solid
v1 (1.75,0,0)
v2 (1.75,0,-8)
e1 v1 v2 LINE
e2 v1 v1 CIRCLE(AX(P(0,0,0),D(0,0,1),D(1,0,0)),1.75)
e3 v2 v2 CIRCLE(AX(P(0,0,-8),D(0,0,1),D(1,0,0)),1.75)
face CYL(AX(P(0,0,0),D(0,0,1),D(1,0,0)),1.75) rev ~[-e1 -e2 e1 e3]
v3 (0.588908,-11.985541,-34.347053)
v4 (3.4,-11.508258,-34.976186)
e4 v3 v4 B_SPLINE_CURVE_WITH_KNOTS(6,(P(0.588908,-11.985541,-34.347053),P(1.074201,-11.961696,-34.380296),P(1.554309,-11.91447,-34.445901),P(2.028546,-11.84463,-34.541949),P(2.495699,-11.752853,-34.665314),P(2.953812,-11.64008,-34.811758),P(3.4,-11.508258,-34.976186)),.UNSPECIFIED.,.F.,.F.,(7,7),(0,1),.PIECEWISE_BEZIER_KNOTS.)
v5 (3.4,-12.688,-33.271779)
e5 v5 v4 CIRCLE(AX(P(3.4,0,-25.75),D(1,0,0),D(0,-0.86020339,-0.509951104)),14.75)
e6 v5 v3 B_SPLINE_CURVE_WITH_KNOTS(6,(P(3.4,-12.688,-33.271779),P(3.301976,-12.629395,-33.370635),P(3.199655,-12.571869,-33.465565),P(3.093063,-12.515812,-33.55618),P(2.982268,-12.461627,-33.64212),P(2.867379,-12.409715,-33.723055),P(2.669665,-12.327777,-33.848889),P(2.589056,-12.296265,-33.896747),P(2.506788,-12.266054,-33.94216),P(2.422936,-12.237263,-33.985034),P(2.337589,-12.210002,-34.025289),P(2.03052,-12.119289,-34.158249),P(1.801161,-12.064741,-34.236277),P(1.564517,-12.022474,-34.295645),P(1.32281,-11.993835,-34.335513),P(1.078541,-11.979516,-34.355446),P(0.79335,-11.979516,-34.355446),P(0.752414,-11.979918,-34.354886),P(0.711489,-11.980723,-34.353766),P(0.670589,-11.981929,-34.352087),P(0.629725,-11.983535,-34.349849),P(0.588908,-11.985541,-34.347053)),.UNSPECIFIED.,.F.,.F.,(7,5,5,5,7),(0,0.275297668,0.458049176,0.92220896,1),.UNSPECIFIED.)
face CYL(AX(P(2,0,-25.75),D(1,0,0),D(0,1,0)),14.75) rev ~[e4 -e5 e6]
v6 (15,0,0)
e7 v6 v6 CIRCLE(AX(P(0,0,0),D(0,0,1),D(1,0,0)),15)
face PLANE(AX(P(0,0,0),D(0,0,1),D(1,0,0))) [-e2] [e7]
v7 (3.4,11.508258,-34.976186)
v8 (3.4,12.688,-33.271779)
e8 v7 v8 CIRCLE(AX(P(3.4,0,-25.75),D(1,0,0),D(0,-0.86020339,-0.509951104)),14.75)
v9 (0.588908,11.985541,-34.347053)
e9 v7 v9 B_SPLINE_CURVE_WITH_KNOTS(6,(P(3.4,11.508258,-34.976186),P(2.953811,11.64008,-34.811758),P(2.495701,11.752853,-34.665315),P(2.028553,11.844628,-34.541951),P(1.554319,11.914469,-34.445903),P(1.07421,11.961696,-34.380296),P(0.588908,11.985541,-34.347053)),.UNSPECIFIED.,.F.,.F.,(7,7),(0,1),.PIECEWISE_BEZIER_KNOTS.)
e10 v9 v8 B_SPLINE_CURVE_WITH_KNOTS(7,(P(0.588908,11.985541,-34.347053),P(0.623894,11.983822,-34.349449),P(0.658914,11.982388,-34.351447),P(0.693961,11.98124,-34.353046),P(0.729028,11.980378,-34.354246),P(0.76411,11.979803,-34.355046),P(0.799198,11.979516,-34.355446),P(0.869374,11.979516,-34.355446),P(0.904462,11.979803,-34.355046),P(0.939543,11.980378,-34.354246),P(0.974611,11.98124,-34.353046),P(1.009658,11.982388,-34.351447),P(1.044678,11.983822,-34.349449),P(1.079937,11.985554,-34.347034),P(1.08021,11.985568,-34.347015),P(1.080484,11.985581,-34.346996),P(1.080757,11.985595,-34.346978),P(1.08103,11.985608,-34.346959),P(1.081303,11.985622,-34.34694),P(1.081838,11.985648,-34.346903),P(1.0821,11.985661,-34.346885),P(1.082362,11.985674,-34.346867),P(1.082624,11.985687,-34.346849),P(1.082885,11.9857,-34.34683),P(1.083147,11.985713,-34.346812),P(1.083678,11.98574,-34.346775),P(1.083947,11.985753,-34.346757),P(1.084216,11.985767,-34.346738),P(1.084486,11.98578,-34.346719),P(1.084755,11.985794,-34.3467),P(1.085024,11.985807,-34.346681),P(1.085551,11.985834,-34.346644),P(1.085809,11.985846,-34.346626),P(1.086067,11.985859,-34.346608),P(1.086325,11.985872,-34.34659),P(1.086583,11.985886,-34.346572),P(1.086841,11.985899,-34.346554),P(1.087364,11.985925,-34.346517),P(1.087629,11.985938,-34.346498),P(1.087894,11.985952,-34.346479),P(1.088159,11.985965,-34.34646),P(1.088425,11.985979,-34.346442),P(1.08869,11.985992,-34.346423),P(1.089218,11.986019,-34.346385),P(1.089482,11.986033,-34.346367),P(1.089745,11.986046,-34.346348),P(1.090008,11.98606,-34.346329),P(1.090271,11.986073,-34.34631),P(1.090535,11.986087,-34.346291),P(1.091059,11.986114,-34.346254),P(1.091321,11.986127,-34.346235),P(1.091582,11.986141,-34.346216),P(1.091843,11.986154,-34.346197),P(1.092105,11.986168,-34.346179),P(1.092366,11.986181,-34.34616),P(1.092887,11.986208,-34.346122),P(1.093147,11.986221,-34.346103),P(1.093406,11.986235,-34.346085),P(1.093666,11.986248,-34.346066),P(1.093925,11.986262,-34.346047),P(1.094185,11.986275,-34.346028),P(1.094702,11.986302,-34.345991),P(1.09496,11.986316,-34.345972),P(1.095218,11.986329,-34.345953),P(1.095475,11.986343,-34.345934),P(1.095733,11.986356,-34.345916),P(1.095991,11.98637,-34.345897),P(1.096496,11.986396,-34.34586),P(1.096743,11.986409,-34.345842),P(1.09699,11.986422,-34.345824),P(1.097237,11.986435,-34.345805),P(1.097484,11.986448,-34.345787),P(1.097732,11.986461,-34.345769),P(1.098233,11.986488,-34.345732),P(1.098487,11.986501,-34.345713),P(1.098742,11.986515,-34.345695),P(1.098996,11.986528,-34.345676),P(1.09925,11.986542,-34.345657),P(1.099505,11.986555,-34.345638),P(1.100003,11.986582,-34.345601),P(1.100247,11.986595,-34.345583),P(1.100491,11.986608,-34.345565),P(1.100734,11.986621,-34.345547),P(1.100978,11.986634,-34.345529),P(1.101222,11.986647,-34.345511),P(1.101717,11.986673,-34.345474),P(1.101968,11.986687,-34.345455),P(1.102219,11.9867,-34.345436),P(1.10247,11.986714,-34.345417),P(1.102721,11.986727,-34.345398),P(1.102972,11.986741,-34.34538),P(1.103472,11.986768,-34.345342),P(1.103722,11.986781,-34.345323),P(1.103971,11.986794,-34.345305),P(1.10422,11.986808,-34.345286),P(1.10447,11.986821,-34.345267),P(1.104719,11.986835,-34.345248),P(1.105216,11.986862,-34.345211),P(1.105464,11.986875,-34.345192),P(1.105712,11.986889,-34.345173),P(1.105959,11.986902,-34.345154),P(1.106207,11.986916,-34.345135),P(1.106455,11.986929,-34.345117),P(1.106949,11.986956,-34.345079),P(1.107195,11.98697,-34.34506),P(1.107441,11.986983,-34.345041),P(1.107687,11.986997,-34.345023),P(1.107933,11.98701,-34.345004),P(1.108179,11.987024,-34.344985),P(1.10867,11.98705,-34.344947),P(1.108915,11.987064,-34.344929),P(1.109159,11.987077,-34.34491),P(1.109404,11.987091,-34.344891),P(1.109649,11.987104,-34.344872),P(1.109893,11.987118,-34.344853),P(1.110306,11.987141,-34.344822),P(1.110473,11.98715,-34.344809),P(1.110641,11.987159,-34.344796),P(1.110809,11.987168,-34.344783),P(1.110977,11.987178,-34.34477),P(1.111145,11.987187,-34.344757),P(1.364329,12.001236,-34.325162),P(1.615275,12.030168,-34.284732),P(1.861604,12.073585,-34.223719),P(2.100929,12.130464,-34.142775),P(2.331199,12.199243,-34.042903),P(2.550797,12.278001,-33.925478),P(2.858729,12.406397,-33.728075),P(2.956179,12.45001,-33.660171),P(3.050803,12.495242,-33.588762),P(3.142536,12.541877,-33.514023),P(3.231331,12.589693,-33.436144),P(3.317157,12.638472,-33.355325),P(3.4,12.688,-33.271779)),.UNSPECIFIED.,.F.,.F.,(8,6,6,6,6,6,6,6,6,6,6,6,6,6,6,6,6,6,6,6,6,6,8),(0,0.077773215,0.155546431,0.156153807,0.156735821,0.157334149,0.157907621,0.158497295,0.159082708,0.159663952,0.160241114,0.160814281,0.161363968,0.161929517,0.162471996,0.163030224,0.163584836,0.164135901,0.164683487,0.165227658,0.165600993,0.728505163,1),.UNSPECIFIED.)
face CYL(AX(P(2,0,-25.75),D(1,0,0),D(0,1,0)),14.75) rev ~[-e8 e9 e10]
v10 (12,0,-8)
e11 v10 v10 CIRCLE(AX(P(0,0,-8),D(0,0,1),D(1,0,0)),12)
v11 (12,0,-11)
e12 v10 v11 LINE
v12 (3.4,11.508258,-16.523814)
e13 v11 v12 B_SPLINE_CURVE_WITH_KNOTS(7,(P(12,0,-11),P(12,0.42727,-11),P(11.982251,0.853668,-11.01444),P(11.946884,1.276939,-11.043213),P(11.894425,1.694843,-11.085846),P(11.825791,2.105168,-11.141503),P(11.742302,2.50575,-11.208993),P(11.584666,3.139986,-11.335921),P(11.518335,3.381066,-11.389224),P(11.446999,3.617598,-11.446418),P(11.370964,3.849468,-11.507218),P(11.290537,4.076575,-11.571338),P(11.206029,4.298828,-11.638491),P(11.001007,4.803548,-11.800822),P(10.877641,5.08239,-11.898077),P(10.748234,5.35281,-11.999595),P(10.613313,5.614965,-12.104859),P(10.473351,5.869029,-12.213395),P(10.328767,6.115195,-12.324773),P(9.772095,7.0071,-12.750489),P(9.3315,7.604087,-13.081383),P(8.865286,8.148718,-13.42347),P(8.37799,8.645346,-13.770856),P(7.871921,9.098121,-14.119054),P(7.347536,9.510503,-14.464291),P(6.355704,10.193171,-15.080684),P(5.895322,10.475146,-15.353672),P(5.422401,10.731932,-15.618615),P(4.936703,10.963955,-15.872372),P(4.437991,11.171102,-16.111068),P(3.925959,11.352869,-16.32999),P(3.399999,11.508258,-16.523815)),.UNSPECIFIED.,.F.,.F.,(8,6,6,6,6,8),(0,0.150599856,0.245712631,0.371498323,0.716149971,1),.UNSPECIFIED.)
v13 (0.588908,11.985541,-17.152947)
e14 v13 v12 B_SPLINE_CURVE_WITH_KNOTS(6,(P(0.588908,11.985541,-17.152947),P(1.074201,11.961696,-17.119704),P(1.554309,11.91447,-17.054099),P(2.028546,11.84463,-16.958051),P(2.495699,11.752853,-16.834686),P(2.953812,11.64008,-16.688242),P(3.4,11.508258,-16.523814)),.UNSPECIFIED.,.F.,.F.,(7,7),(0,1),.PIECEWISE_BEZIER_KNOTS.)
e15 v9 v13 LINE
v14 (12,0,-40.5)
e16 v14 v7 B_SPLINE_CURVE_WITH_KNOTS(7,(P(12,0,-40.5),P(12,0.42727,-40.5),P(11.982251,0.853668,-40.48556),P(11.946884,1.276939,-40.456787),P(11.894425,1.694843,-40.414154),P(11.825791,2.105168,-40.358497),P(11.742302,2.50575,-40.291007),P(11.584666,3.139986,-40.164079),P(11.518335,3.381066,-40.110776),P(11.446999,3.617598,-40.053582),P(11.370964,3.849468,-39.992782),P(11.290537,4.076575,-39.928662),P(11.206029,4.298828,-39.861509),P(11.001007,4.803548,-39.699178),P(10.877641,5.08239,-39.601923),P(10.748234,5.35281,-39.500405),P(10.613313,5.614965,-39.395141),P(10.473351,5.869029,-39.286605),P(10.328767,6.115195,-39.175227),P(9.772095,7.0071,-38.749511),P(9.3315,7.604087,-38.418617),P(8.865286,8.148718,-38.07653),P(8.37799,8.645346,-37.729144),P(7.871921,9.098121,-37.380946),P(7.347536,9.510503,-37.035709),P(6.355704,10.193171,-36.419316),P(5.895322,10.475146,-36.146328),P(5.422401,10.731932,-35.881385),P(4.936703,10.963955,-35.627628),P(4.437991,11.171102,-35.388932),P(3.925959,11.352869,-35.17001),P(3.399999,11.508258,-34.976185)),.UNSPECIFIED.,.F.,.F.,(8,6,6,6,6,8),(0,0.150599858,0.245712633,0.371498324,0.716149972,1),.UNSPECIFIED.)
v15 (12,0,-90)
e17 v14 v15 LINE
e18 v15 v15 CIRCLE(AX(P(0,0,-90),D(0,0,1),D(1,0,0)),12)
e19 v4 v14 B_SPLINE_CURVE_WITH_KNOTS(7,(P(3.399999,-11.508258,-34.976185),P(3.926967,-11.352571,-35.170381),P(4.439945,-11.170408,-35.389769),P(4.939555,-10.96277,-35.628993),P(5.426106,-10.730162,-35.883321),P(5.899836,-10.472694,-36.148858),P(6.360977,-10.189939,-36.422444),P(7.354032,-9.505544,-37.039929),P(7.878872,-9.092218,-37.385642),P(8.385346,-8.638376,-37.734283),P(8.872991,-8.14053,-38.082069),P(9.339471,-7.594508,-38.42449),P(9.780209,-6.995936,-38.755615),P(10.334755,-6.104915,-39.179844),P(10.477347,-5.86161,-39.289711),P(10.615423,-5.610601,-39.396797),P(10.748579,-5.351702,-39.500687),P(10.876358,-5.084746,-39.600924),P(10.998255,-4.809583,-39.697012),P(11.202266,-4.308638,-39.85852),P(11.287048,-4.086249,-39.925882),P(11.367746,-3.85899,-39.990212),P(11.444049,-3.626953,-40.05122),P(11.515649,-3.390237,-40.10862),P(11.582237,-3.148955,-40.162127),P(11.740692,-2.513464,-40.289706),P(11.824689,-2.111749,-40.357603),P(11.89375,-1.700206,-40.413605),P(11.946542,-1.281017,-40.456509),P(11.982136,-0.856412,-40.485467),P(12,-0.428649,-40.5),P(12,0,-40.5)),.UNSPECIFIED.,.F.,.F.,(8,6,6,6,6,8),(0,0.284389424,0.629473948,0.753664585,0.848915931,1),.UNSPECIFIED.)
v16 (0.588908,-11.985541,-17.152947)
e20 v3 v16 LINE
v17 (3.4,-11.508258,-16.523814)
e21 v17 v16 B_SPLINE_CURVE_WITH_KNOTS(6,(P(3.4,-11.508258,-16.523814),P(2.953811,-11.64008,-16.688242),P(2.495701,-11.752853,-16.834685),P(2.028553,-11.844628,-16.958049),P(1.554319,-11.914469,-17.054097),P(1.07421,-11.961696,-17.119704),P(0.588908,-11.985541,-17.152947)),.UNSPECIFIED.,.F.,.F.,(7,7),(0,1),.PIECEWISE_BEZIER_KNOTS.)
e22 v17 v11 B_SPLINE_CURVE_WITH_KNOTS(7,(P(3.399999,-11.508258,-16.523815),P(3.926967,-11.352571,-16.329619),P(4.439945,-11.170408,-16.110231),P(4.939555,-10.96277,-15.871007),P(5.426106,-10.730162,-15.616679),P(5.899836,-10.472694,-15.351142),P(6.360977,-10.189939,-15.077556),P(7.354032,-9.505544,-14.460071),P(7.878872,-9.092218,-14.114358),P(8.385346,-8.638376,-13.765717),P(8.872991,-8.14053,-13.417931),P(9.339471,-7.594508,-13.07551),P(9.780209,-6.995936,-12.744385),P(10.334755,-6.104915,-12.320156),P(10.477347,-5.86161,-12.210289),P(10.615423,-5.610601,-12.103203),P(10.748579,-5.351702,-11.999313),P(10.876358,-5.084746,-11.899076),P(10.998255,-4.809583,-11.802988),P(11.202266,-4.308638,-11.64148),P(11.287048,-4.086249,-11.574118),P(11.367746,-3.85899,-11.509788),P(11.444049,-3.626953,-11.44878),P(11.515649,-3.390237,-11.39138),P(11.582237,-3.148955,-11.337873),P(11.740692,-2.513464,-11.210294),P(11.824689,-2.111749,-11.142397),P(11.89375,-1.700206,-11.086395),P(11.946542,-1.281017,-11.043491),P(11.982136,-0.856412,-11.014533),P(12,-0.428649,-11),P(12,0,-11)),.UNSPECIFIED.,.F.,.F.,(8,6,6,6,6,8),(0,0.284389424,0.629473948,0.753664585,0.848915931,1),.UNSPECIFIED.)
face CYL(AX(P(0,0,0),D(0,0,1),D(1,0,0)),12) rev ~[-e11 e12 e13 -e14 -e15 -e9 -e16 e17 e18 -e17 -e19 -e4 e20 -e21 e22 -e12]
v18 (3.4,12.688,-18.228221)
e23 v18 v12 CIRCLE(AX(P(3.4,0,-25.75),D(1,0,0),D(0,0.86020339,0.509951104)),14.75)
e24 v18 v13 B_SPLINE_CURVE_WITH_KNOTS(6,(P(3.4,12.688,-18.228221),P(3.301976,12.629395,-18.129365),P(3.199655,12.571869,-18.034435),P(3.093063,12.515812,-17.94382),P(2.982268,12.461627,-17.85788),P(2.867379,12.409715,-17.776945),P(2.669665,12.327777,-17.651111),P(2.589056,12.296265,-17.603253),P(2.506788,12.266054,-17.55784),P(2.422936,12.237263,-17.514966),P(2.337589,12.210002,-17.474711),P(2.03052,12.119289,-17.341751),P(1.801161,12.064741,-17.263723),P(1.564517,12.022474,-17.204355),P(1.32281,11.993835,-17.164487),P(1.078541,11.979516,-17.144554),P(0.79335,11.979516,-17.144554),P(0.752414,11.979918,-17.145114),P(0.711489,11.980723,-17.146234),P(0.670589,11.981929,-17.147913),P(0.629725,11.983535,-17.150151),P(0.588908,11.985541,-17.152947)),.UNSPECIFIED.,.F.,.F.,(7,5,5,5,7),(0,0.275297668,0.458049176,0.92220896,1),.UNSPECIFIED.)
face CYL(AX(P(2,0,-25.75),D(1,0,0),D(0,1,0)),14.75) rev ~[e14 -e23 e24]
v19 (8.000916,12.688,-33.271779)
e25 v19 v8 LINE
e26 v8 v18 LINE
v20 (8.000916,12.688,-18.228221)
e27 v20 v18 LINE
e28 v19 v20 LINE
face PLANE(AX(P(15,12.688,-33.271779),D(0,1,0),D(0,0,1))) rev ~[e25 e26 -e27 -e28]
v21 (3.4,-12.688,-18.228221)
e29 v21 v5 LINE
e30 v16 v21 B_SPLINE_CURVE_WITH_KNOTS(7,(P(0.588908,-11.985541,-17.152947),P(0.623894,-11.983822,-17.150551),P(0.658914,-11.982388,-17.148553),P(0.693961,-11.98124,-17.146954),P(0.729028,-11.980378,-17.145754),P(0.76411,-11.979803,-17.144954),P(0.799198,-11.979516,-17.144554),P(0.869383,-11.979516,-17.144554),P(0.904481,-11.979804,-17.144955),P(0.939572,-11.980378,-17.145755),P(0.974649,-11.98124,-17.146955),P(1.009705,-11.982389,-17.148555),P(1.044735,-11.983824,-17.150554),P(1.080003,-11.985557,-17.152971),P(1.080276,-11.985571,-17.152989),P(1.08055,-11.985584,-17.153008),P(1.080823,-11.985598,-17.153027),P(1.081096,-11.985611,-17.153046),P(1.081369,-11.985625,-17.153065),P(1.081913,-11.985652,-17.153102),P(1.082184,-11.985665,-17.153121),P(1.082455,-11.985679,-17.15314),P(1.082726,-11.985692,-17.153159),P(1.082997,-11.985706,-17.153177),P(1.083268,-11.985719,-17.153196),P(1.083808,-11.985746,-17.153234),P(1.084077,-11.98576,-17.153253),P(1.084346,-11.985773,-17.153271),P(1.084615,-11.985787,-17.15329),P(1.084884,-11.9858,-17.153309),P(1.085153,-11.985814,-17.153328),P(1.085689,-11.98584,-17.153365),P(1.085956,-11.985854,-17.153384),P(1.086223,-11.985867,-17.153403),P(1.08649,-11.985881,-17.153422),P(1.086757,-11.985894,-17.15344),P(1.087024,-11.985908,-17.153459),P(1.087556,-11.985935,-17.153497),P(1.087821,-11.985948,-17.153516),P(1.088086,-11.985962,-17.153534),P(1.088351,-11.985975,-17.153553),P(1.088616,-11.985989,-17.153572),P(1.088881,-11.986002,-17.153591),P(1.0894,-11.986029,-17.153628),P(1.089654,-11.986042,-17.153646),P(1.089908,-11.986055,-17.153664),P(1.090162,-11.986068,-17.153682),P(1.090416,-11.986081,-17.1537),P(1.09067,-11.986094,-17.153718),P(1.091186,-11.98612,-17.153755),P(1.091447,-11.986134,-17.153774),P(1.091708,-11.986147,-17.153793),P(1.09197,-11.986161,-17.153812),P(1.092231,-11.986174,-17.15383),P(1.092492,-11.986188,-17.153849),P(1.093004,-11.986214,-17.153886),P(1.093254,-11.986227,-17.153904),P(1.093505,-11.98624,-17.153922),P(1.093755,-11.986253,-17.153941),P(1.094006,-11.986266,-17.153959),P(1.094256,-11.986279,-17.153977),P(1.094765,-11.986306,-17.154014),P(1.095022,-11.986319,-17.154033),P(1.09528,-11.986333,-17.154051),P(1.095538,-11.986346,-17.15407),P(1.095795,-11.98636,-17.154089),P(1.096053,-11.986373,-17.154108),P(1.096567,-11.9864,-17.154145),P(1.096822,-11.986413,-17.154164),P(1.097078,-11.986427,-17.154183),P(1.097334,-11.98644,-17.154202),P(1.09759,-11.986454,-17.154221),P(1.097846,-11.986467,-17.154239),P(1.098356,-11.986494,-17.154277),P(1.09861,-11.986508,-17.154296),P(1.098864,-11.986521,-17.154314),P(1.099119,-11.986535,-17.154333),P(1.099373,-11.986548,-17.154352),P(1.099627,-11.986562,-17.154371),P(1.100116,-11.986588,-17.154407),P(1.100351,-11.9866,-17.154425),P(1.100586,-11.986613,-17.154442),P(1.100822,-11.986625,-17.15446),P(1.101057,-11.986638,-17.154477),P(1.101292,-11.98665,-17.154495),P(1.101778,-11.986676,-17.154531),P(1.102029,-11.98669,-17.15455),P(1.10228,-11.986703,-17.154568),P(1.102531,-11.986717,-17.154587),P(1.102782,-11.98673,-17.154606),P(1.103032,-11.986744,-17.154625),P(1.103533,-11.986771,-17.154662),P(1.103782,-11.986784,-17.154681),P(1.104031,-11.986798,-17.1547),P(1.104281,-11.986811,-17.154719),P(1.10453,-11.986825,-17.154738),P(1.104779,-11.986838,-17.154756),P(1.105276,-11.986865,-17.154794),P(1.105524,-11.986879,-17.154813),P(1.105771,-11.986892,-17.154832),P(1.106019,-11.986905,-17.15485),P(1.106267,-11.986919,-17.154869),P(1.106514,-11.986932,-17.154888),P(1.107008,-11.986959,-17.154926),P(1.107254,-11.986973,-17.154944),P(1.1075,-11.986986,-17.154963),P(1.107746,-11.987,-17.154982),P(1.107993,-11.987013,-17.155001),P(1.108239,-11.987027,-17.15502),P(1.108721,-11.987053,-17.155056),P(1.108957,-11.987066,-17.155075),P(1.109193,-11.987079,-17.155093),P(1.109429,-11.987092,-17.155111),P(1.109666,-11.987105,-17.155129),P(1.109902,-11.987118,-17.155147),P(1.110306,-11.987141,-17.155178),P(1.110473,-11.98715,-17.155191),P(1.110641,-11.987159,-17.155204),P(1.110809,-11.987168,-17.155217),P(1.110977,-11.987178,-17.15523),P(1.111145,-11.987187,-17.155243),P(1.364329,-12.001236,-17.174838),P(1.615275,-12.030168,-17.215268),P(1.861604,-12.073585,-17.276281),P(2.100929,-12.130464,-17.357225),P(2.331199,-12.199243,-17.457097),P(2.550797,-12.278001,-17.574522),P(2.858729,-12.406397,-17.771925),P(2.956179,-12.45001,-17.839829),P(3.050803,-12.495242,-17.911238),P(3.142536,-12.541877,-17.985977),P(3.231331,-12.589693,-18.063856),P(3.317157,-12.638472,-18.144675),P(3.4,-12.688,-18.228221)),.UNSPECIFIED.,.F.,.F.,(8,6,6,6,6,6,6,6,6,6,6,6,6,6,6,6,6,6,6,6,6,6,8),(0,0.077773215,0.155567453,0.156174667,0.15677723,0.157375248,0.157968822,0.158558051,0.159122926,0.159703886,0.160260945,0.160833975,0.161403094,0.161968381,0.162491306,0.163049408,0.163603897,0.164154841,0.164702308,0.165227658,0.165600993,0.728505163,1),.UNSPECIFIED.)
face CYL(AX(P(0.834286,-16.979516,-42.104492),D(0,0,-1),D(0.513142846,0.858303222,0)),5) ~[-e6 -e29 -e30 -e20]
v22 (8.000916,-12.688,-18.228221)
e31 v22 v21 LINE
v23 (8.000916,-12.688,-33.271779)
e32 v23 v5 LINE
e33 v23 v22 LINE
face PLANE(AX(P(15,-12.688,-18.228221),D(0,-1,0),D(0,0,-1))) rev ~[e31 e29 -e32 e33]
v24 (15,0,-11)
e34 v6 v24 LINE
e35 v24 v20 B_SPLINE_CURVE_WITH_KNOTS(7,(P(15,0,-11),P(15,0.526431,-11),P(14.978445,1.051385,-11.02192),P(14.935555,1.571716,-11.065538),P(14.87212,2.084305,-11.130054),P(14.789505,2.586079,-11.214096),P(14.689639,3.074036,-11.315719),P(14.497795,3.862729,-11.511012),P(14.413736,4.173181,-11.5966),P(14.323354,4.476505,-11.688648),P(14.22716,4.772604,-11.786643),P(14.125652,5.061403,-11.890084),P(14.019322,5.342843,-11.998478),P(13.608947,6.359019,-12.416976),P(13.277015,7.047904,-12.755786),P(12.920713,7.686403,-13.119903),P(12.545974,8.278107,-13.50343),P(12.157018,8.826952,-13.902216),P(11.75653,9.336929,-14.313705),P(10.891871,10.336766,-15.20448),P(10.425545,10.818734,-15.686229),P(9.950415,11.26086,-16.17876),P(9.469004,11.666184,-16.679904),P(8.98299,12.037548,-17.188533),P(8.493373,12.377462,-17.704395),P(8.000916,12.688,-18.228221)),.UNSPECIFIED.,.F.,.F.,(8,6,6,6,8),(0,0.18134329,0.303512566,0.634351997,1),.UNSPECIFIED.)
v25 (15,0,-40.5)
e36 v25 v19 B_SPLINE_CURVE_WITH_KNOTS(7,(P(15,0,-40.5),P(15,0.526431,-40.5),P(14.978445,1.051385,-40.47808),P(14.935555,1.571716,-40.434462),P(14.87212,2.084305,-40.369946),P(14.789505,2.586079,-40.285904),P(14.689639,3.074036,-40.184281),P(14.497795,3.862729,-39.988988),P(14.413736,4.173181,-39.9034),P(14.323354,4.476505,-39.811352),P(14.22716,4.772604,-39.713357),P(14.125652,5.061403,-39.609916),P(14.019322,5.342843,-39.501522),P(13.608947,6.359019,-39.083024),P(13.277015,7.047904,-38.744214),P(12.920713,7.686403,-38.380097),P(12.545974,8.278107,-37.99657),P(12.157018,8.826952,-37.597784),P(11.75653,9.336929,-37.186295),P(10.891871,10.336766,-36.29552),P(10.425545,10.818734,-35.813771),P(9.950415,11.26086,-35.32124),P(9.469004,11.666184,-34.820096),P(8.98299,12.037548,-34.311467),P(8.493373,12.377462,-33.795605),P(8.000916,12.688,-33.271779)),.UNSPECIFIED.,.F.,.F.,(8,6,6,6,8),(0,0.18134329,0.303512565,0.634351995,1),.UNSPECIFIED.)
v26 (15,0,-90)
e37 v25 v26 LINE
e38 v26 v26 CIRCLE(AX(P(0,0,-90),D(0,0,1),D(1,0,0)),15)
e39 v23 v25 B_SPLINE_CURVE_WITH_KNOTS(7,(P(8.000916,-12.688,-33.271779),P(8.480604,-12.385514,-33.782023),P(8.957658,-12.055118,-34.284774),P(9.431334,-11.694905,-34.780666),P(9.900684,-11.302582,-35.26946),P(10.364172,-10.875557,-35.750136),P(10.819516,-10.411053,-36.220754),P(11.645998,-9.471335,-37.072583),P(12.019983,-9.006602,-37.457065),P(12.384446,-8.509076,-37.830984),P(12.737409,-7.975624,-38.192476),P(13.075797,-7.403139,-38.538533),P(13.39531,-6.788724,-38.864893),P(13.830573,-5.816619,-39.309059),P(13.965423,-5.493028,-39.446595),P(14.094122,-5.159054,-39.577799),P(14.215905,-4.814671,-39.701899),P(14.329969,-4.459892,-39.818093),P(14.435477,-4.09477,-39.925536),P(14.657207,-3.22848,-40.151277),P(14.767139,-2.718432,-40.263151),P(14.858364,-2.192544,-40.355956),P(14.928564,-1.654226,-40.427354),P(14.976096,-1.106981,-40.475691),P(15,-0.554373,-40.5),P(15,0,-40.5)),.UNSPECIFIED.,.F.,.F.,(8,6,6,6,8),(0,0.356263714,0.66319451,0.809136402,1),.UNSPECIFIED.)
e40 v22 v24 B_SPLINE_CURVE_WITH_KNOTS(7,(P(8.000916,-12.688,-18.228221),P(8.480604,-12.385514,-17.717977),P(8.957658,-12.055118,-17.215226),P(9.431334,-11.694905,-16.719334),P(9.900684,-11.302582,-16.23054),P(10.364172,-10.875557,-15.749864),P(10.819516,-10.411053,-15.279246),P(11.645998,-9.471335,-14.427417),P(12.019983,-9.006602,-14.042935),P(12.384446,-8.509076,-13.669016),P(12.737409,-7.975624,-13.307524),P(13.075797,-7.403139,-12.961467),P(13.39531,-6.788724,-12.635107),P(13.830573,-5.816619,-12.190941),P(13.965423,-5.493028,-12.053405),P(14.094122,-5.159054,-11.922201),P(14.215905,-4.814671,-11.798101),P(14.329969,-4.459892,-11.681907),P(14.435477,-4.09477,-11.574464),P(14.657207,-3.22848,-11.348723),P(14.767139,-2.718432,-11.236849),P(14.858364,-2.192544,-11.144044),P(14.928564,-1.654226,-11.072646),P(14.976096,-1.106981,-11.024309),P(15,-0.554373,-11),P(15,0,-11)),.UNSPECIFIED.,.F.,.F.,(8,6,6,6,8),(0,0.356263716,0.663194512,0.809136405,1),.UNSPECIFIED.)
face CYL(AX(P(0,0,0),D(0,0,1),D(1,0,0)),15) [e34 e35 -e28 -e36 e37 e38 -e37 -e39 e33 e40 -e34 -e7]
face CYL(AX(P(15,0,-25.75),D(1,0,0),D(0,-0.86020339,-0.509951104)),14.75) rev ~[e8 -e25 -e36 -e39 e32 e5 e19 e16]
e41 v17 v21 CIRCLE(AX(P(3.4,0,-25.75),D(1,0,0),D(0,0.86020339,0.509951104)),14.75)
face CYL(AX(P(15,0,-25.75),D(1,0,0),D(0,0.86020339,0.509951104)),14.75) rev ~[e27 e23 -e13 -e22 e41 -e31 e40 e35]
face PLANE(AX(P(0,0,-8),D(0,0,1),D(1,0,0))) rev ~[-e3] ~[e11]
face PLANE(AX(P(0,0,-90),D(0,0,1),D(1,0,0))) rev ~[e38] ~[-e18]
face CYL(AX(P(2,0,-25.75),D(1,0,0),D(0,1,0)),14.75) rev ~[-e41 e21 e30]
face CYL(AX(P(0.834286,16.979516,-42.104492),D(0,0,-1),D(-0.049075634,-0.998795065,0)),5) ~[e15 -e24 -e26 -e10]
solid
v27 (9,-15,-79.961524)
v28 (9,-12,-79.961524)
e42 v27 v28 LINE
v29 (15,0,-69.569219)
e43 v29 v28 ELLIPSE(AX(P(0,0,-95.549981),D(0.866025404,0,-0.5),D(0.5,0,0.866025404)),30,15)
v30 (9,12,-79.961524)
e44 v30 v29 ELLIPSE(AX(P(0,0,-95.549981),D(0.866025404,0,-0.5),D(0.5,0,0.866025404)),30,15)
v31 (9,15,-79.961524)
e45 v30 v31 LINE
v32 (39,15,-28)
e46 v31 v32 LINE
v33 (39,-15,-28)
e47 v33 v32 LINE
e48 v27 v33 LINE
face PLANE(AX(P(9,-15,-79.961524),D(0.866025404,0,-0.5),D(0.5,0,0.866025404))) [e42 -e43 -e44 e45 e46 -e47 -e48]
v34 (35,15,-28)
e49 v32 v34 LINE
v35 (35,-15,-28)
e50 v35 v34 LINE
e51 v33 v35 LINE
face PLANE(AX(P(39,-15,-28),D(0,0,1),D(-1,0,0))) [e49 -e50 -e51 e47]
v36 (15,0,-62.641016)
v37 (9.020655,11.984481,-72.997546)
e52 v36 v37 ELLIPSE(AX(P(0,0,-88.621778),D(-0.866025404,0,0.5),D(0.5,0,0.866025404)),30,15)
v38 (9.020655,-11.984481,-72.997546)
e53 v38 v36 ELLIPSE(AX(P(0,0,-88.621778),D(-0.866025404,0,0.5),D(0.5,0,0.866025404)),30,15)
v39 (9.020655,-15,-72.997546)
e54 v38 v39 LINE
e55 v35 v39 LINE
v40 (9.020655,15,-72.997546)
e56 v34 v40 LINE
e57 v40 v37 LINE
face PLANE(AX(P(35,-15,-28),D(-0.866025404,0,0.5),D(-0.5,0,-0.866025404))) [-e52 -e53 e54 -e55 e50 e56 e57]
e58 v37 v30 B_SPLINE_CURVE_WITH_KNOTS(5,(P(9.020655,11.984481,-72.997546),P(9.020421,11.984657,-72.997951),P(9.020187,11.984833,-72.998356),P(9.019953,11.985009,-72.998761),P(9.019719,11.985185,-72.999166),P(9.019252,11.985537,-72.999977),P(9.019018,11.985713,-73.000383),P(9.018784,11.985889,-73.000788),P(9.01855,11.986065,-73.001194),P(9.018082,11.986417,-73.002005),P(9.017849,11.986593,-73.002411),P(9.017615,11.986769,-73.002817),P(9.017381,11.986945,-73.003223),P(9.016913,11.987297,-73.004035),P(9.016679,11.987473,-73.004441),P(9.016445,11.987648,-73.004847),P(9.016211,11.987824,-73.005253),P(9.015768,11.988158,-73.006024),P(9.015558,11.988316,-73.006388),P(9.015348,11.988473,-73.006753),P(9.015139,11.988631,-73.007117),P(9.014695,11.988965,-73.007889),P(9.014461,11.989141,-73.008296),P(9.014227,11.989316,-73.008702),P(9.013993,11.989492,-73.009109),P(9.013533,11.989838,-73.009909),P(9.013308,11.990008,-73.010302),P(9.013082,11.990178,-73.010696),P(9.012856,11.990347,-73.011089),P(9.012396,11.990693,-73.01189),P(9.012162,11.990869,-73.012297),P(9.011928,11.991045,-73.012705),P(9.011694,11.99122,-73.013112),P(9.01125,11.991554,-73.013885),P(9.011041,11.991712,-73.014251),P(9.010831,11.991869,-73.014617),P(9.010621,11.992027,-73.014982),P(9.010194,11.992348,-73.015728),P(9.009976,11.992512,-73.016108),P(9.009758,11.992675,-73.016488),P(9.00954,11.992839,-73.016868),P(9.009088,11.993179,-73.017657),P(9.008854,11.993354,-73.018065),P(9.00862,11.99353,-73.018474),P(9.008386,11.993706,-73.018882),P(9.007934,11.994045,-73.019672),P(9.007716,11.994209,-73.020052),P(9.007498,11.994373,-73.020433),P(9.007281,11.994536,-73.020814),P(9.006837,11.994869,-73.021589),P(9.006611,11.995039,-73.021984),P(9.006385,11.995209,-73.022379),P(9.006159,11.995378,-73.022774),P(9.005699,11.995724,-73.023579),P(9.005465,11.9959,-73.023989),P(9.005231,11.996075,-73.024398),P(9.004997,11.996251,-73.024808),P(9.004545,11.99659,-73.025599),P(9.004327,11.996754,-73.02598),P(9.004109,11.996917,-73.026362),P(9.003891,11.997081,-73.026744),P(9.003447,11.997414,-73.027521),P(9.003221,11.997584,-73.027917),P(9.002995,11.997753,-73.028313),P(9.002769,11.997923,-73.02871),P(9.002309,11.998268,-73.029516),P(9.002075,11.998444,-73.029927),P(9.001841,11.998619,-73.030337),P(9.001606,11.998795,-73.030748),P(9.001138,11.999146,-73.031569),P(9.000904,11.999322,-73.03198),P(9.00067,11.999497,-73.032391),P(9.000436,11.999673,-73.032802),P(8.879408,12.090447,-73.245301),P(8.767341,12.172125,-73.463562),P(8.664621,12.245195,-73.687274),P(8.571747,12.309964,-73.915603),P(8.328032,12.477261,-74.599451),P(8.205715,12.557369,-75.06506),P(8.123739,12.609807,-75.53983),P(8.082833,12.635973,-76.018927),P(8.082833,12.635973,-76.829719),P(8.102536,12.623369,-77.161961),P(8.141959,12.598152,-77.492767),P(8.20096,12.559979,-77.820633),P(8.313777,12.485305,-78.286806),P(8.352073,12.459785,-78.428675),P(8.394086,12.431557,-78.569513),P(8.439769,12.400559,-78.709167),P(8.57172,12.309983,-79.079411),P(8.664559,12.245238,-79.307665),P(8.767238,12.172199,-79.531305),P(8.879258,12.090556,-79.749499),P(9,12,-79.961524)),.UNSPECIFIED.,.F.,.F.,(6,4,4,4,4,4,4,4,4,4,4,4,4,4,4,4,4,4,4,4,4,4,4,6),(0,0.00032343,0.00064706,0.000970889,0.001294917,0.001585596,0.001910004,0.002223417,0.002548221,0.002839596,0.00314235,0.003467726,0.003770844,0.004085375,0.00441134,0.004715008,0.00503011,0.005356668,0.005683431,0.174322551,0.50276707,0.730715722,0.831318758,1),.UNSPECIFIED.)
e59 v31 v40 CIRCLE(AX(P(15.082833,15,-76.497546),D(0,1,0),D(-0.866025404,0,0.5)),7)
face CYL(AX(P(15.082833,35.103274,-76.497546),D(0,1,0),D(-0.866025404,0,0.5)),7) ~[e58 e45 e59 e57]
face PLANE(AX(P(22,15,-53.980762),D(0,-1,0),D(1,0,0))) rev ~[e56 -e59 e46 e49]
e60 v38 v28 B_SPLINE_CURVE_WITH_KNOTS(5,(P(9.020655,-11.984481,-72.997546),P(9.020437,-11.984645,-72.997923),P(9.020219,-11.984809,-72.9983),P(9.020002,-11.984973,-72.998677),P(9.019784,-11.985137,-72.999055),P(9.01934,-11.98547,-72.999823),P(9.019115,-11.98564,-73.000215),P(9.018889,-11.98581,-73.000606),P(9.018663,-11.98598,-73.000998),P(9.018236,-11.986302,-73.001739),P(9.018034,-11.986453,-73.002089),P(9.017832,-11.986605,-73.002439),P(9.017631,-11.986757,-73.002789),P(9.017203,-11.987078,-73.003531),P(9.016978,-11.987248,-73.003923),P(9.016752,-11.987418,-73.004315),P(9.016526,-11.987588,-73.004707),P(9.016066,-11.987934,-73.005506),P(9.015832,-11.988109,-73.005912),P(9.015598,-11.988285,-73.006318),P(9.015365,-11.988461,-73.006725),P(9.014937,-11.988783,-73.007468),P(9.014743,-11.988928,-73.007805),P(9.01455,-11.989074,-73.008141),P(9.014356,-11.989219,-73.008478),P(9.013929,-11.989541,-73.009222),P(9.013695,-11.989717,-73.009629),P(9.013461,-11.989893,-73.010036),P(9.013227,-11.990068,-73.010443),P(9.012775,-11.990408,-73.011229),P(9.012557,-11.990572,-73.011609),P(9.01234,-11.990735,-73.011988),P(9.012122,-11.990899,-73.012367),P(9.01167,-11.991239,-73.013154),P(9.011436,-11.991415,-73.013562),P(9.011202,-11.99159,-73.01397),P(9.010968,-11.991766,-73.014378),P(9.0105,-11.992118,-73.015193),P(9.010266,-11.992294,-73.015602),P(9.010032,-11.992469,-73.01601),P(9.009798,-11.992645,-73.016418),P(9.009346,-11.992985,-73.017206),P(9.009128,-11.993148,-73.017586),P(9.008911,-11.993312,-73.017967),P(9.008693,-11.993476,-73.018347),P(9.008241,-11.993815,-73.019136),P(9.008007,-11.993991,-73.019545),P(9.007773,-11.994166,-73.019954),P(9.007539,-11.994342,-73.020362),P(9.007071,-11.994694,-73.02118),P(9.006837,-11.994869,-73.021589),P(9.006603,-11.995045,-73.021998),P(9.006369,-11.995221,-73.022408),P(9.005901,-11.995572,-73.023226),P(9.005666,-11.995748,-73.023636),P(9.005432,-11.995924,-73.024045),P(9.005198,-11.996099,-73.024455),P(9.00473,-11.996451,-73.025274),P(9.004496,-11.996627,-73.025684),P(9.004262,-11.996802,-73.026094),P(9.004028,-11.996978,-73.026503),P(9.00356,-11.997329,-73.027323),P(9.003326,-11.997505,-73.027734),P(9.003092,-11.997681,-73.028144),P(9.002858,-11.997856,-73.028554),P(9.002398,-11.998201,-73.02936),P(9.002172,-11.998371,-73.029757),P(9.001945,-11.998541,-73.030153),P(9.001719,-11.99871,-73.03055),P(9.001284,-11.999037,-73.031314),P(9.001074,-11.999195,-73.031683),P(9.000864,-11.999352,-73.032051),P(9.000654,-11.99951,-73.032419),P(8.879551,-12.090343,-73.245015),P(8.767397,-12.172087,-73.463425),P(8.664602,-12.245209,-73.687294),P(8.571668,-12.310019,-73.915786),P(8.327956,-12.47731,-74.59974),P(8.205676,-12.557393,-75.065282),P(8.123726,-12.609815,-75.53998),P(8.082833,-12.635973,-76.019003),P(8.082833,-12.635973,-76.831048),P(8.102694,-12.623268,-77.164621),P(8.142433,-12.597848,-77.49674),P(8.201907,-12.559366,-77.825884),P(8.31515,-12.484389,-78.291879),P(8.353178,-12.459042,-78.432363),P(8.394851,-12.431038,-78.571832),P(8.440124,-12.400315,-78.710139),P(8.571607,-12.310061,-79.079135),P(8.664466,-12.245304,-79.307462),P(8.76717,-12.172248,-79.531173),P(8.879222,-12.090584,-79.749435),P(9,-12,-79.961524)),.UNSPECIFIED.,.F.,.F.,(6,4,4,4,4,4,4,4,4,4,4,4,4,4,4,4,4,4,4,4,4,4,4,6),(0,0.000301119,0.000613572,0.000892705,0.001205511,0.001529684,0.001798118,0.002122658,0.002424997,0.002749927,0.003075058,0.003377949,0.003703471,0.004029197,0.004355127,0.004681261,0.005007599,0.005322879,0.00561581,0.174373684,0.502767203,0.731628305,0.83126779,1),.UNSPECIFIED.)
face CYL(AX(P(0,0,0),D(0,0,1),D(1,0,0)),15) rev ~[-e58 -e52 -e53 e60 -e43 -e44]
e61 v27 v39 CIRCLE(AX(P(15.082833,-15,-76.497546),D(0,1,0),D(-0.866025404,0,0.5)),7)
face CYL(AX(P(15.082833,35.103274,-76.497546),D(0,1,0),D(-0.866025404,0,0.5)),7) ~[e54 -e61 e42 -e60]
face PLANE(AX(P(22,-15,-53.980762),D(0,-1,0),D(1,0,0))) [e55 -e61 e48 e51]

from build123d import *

# Parameters (mm, degrees)
F0_R         = 15
F0_R_2       = 12
F1_DEPTH     = 90
F0_R_3       = 1.75
F2_DEPTH     = 8
F5_DEPTH     = 11.6
F6_T4_DEPTH  = 32.7089830992
F6_S5_R      = 14.75
F6_T6_DEPTH  = 18
F6_T10_DEPTH = 32.7089830992
F6_S11_R     = 14.75
F6_T12_DEPTH = 18
F9_DEPTH     = 30
F10_T1_DEPTH = 70.2065483844
F11_DEPTH    = 103.2


# Not quite as in the source:
# - a fillet or chamfer that OpenCascade refuses, or shapes differently, is made with other operations: its cross-section is extruded or revolved along the edge and cut away or added


with BuildPart() as f1:
    # F0 (on Top) → F1 (new body)
    with BuildSketch(Plane.XY):
        Circle(F0_R)
        Circle(F0_R_2, mode=Mode.SUBTRACT)
    extrude(amount=-F1_DEPTH)

    # F0 (on Top) → F2 (join)
    with BuildSketch(Plane.XY):
        Circle(F0_R_2)
        Circle(F0_R_3, mode=Mode.SUBTRACT)
    extrude(amount=-F2_DEPTH)

    # F4 (on offset) → F5 (cut)
    with BuildSketch(Plane.YZ.offset(15)):
        with BuildLine():
            Line((12.688, -33.271778779), (12.688, -18.228221221))
            ThreePointArc((12.688, -18.228221221), (0, -11), (-12.688, -18.228221221))
            Line((-12.688, -18.228221221), (-12.688, -33.271778779))
            ThreePointArc((-12.688, -33.271778779), (0, -40.5), (12.688, -33.271778779))
        make_face()
    extrude(amount=-F5_DEPTH, mode=Mode.SUBTRACT)

    # F6: fillet of radius 5 on 2 edges, made by hand


with BuildPart() as f6_tool2:
    # F6_s3 → F6_t4 (new body)
    with BuildSketch(Plane.XY.offset(-42.1044915496)):
        with BuildLine():
            ThreePointArc((3.4, -12.688), (2.0464541168, -12.1286761902), (0.588907604, -11.9855407819))
            ThreePointArc((0.588907604, -11.9855407819), (2.0086800902, -11.8306890879), (3.4, -11.5082579047))
            Line((3.4, -11.5082579047), (3.4, -12.688))
        make_face()
    extrude(amount=F6_T4_DEPTH)

    # F6_s5 → F6_t6 (intersect, symmetric)
    with BuildSketch(Plane.YZ.offset(2)):
        with Locations((0, -25.75)):
            Circle(F6_S5_R)
    extrude(amount=F6_T6_DEPTH, both=True, mode=Mode.INTERSECT)


with BuildPart() as f1_1:
    add(f1.part)

    # F6_t1: cut F6_tool2
    add(f6_tool2.part, mode=Mode.SUBTRACT)


with BuildPart() as f6_tool8:
    # F6_s9 → F6_t10 (new body)
    with BuildSketch(Plane.XY.offset(-42.1044915496)):
        with BuildLine():
            ThreePointArc((0.588907604, 11.9855407819), (2.0464541168, 12.1286761902), (3.4, 12.688))
            Line((3.4, 12.688), (3.4, 11.5082579047))
            ThreePointArc((3.4, 11.5082579047), (2.0086800902, 11.8306890879), (0.588907604, 11.9855407819))
        make_face()
    extrude(amount=F6_T10_DEPTH)

    # F6_s11 → F6_t12 (intersect, symmetric)
    with BuildSketch(Plane.YZ.offset(2)):
        with Locations((0, -25.75)):
            Circle(F6_S11_R)
    extrude(amount=F6_T12_DEPTH, both=True, mode=Mode.INTERSECT)


with BuildPart() as f1_2:
    add(f1_1.part)

    # F6_t7: cut F6_tool8
    add(f6_tool8.part, mode=Mode.SUBTRACT)


with BuildPart() as f9:
    # F8 (on offset) → F9 (new body)
    with BuildSketch(Plane.XZ.offset(15)):
        Polygon((9, -79.9615242271), (39, -28), (35, -28), (5, -79.9615242271), align=None)
    extrude(amount=-F9_DEPTH)

    # F10: fillet of radius 7 on 1 edges, made by hand

    # F10_s2 → F10_t1 (cut)
    with BuildSketch(Plane.XZ.offset(-35.1032741922)):
        with BuildLine():
            ThreePointArc((9.0206548384, -72.9975457672), (8.0828634538, -76.4767841818), (9, -79.9615242271))
            Line((9, -79.9615242271), (5, -79.9615242271))
            Line((5, -79.9615242271), (9.0206548384, -72.9975457672))
        make_face()
    extrude(amount=F10_T1_DEPTH, mode=Mode.SUBTRACT)

    # F0 (on Top) → F11 (cut)
    with BuildSketch(Plane.XY):
        Circle(F0_R)
        Circle(F0_R_2, mode=Mode.SUBTRACT)
        Circle(F0_R_2)
        Circle(F0_R_3, mode=Mode.SUBTRACT)
    extrude(amount=-F11_DEPTH, mode=Mode.SUBTRACT)


solid = Compound([f1_2.part, f9.part])
